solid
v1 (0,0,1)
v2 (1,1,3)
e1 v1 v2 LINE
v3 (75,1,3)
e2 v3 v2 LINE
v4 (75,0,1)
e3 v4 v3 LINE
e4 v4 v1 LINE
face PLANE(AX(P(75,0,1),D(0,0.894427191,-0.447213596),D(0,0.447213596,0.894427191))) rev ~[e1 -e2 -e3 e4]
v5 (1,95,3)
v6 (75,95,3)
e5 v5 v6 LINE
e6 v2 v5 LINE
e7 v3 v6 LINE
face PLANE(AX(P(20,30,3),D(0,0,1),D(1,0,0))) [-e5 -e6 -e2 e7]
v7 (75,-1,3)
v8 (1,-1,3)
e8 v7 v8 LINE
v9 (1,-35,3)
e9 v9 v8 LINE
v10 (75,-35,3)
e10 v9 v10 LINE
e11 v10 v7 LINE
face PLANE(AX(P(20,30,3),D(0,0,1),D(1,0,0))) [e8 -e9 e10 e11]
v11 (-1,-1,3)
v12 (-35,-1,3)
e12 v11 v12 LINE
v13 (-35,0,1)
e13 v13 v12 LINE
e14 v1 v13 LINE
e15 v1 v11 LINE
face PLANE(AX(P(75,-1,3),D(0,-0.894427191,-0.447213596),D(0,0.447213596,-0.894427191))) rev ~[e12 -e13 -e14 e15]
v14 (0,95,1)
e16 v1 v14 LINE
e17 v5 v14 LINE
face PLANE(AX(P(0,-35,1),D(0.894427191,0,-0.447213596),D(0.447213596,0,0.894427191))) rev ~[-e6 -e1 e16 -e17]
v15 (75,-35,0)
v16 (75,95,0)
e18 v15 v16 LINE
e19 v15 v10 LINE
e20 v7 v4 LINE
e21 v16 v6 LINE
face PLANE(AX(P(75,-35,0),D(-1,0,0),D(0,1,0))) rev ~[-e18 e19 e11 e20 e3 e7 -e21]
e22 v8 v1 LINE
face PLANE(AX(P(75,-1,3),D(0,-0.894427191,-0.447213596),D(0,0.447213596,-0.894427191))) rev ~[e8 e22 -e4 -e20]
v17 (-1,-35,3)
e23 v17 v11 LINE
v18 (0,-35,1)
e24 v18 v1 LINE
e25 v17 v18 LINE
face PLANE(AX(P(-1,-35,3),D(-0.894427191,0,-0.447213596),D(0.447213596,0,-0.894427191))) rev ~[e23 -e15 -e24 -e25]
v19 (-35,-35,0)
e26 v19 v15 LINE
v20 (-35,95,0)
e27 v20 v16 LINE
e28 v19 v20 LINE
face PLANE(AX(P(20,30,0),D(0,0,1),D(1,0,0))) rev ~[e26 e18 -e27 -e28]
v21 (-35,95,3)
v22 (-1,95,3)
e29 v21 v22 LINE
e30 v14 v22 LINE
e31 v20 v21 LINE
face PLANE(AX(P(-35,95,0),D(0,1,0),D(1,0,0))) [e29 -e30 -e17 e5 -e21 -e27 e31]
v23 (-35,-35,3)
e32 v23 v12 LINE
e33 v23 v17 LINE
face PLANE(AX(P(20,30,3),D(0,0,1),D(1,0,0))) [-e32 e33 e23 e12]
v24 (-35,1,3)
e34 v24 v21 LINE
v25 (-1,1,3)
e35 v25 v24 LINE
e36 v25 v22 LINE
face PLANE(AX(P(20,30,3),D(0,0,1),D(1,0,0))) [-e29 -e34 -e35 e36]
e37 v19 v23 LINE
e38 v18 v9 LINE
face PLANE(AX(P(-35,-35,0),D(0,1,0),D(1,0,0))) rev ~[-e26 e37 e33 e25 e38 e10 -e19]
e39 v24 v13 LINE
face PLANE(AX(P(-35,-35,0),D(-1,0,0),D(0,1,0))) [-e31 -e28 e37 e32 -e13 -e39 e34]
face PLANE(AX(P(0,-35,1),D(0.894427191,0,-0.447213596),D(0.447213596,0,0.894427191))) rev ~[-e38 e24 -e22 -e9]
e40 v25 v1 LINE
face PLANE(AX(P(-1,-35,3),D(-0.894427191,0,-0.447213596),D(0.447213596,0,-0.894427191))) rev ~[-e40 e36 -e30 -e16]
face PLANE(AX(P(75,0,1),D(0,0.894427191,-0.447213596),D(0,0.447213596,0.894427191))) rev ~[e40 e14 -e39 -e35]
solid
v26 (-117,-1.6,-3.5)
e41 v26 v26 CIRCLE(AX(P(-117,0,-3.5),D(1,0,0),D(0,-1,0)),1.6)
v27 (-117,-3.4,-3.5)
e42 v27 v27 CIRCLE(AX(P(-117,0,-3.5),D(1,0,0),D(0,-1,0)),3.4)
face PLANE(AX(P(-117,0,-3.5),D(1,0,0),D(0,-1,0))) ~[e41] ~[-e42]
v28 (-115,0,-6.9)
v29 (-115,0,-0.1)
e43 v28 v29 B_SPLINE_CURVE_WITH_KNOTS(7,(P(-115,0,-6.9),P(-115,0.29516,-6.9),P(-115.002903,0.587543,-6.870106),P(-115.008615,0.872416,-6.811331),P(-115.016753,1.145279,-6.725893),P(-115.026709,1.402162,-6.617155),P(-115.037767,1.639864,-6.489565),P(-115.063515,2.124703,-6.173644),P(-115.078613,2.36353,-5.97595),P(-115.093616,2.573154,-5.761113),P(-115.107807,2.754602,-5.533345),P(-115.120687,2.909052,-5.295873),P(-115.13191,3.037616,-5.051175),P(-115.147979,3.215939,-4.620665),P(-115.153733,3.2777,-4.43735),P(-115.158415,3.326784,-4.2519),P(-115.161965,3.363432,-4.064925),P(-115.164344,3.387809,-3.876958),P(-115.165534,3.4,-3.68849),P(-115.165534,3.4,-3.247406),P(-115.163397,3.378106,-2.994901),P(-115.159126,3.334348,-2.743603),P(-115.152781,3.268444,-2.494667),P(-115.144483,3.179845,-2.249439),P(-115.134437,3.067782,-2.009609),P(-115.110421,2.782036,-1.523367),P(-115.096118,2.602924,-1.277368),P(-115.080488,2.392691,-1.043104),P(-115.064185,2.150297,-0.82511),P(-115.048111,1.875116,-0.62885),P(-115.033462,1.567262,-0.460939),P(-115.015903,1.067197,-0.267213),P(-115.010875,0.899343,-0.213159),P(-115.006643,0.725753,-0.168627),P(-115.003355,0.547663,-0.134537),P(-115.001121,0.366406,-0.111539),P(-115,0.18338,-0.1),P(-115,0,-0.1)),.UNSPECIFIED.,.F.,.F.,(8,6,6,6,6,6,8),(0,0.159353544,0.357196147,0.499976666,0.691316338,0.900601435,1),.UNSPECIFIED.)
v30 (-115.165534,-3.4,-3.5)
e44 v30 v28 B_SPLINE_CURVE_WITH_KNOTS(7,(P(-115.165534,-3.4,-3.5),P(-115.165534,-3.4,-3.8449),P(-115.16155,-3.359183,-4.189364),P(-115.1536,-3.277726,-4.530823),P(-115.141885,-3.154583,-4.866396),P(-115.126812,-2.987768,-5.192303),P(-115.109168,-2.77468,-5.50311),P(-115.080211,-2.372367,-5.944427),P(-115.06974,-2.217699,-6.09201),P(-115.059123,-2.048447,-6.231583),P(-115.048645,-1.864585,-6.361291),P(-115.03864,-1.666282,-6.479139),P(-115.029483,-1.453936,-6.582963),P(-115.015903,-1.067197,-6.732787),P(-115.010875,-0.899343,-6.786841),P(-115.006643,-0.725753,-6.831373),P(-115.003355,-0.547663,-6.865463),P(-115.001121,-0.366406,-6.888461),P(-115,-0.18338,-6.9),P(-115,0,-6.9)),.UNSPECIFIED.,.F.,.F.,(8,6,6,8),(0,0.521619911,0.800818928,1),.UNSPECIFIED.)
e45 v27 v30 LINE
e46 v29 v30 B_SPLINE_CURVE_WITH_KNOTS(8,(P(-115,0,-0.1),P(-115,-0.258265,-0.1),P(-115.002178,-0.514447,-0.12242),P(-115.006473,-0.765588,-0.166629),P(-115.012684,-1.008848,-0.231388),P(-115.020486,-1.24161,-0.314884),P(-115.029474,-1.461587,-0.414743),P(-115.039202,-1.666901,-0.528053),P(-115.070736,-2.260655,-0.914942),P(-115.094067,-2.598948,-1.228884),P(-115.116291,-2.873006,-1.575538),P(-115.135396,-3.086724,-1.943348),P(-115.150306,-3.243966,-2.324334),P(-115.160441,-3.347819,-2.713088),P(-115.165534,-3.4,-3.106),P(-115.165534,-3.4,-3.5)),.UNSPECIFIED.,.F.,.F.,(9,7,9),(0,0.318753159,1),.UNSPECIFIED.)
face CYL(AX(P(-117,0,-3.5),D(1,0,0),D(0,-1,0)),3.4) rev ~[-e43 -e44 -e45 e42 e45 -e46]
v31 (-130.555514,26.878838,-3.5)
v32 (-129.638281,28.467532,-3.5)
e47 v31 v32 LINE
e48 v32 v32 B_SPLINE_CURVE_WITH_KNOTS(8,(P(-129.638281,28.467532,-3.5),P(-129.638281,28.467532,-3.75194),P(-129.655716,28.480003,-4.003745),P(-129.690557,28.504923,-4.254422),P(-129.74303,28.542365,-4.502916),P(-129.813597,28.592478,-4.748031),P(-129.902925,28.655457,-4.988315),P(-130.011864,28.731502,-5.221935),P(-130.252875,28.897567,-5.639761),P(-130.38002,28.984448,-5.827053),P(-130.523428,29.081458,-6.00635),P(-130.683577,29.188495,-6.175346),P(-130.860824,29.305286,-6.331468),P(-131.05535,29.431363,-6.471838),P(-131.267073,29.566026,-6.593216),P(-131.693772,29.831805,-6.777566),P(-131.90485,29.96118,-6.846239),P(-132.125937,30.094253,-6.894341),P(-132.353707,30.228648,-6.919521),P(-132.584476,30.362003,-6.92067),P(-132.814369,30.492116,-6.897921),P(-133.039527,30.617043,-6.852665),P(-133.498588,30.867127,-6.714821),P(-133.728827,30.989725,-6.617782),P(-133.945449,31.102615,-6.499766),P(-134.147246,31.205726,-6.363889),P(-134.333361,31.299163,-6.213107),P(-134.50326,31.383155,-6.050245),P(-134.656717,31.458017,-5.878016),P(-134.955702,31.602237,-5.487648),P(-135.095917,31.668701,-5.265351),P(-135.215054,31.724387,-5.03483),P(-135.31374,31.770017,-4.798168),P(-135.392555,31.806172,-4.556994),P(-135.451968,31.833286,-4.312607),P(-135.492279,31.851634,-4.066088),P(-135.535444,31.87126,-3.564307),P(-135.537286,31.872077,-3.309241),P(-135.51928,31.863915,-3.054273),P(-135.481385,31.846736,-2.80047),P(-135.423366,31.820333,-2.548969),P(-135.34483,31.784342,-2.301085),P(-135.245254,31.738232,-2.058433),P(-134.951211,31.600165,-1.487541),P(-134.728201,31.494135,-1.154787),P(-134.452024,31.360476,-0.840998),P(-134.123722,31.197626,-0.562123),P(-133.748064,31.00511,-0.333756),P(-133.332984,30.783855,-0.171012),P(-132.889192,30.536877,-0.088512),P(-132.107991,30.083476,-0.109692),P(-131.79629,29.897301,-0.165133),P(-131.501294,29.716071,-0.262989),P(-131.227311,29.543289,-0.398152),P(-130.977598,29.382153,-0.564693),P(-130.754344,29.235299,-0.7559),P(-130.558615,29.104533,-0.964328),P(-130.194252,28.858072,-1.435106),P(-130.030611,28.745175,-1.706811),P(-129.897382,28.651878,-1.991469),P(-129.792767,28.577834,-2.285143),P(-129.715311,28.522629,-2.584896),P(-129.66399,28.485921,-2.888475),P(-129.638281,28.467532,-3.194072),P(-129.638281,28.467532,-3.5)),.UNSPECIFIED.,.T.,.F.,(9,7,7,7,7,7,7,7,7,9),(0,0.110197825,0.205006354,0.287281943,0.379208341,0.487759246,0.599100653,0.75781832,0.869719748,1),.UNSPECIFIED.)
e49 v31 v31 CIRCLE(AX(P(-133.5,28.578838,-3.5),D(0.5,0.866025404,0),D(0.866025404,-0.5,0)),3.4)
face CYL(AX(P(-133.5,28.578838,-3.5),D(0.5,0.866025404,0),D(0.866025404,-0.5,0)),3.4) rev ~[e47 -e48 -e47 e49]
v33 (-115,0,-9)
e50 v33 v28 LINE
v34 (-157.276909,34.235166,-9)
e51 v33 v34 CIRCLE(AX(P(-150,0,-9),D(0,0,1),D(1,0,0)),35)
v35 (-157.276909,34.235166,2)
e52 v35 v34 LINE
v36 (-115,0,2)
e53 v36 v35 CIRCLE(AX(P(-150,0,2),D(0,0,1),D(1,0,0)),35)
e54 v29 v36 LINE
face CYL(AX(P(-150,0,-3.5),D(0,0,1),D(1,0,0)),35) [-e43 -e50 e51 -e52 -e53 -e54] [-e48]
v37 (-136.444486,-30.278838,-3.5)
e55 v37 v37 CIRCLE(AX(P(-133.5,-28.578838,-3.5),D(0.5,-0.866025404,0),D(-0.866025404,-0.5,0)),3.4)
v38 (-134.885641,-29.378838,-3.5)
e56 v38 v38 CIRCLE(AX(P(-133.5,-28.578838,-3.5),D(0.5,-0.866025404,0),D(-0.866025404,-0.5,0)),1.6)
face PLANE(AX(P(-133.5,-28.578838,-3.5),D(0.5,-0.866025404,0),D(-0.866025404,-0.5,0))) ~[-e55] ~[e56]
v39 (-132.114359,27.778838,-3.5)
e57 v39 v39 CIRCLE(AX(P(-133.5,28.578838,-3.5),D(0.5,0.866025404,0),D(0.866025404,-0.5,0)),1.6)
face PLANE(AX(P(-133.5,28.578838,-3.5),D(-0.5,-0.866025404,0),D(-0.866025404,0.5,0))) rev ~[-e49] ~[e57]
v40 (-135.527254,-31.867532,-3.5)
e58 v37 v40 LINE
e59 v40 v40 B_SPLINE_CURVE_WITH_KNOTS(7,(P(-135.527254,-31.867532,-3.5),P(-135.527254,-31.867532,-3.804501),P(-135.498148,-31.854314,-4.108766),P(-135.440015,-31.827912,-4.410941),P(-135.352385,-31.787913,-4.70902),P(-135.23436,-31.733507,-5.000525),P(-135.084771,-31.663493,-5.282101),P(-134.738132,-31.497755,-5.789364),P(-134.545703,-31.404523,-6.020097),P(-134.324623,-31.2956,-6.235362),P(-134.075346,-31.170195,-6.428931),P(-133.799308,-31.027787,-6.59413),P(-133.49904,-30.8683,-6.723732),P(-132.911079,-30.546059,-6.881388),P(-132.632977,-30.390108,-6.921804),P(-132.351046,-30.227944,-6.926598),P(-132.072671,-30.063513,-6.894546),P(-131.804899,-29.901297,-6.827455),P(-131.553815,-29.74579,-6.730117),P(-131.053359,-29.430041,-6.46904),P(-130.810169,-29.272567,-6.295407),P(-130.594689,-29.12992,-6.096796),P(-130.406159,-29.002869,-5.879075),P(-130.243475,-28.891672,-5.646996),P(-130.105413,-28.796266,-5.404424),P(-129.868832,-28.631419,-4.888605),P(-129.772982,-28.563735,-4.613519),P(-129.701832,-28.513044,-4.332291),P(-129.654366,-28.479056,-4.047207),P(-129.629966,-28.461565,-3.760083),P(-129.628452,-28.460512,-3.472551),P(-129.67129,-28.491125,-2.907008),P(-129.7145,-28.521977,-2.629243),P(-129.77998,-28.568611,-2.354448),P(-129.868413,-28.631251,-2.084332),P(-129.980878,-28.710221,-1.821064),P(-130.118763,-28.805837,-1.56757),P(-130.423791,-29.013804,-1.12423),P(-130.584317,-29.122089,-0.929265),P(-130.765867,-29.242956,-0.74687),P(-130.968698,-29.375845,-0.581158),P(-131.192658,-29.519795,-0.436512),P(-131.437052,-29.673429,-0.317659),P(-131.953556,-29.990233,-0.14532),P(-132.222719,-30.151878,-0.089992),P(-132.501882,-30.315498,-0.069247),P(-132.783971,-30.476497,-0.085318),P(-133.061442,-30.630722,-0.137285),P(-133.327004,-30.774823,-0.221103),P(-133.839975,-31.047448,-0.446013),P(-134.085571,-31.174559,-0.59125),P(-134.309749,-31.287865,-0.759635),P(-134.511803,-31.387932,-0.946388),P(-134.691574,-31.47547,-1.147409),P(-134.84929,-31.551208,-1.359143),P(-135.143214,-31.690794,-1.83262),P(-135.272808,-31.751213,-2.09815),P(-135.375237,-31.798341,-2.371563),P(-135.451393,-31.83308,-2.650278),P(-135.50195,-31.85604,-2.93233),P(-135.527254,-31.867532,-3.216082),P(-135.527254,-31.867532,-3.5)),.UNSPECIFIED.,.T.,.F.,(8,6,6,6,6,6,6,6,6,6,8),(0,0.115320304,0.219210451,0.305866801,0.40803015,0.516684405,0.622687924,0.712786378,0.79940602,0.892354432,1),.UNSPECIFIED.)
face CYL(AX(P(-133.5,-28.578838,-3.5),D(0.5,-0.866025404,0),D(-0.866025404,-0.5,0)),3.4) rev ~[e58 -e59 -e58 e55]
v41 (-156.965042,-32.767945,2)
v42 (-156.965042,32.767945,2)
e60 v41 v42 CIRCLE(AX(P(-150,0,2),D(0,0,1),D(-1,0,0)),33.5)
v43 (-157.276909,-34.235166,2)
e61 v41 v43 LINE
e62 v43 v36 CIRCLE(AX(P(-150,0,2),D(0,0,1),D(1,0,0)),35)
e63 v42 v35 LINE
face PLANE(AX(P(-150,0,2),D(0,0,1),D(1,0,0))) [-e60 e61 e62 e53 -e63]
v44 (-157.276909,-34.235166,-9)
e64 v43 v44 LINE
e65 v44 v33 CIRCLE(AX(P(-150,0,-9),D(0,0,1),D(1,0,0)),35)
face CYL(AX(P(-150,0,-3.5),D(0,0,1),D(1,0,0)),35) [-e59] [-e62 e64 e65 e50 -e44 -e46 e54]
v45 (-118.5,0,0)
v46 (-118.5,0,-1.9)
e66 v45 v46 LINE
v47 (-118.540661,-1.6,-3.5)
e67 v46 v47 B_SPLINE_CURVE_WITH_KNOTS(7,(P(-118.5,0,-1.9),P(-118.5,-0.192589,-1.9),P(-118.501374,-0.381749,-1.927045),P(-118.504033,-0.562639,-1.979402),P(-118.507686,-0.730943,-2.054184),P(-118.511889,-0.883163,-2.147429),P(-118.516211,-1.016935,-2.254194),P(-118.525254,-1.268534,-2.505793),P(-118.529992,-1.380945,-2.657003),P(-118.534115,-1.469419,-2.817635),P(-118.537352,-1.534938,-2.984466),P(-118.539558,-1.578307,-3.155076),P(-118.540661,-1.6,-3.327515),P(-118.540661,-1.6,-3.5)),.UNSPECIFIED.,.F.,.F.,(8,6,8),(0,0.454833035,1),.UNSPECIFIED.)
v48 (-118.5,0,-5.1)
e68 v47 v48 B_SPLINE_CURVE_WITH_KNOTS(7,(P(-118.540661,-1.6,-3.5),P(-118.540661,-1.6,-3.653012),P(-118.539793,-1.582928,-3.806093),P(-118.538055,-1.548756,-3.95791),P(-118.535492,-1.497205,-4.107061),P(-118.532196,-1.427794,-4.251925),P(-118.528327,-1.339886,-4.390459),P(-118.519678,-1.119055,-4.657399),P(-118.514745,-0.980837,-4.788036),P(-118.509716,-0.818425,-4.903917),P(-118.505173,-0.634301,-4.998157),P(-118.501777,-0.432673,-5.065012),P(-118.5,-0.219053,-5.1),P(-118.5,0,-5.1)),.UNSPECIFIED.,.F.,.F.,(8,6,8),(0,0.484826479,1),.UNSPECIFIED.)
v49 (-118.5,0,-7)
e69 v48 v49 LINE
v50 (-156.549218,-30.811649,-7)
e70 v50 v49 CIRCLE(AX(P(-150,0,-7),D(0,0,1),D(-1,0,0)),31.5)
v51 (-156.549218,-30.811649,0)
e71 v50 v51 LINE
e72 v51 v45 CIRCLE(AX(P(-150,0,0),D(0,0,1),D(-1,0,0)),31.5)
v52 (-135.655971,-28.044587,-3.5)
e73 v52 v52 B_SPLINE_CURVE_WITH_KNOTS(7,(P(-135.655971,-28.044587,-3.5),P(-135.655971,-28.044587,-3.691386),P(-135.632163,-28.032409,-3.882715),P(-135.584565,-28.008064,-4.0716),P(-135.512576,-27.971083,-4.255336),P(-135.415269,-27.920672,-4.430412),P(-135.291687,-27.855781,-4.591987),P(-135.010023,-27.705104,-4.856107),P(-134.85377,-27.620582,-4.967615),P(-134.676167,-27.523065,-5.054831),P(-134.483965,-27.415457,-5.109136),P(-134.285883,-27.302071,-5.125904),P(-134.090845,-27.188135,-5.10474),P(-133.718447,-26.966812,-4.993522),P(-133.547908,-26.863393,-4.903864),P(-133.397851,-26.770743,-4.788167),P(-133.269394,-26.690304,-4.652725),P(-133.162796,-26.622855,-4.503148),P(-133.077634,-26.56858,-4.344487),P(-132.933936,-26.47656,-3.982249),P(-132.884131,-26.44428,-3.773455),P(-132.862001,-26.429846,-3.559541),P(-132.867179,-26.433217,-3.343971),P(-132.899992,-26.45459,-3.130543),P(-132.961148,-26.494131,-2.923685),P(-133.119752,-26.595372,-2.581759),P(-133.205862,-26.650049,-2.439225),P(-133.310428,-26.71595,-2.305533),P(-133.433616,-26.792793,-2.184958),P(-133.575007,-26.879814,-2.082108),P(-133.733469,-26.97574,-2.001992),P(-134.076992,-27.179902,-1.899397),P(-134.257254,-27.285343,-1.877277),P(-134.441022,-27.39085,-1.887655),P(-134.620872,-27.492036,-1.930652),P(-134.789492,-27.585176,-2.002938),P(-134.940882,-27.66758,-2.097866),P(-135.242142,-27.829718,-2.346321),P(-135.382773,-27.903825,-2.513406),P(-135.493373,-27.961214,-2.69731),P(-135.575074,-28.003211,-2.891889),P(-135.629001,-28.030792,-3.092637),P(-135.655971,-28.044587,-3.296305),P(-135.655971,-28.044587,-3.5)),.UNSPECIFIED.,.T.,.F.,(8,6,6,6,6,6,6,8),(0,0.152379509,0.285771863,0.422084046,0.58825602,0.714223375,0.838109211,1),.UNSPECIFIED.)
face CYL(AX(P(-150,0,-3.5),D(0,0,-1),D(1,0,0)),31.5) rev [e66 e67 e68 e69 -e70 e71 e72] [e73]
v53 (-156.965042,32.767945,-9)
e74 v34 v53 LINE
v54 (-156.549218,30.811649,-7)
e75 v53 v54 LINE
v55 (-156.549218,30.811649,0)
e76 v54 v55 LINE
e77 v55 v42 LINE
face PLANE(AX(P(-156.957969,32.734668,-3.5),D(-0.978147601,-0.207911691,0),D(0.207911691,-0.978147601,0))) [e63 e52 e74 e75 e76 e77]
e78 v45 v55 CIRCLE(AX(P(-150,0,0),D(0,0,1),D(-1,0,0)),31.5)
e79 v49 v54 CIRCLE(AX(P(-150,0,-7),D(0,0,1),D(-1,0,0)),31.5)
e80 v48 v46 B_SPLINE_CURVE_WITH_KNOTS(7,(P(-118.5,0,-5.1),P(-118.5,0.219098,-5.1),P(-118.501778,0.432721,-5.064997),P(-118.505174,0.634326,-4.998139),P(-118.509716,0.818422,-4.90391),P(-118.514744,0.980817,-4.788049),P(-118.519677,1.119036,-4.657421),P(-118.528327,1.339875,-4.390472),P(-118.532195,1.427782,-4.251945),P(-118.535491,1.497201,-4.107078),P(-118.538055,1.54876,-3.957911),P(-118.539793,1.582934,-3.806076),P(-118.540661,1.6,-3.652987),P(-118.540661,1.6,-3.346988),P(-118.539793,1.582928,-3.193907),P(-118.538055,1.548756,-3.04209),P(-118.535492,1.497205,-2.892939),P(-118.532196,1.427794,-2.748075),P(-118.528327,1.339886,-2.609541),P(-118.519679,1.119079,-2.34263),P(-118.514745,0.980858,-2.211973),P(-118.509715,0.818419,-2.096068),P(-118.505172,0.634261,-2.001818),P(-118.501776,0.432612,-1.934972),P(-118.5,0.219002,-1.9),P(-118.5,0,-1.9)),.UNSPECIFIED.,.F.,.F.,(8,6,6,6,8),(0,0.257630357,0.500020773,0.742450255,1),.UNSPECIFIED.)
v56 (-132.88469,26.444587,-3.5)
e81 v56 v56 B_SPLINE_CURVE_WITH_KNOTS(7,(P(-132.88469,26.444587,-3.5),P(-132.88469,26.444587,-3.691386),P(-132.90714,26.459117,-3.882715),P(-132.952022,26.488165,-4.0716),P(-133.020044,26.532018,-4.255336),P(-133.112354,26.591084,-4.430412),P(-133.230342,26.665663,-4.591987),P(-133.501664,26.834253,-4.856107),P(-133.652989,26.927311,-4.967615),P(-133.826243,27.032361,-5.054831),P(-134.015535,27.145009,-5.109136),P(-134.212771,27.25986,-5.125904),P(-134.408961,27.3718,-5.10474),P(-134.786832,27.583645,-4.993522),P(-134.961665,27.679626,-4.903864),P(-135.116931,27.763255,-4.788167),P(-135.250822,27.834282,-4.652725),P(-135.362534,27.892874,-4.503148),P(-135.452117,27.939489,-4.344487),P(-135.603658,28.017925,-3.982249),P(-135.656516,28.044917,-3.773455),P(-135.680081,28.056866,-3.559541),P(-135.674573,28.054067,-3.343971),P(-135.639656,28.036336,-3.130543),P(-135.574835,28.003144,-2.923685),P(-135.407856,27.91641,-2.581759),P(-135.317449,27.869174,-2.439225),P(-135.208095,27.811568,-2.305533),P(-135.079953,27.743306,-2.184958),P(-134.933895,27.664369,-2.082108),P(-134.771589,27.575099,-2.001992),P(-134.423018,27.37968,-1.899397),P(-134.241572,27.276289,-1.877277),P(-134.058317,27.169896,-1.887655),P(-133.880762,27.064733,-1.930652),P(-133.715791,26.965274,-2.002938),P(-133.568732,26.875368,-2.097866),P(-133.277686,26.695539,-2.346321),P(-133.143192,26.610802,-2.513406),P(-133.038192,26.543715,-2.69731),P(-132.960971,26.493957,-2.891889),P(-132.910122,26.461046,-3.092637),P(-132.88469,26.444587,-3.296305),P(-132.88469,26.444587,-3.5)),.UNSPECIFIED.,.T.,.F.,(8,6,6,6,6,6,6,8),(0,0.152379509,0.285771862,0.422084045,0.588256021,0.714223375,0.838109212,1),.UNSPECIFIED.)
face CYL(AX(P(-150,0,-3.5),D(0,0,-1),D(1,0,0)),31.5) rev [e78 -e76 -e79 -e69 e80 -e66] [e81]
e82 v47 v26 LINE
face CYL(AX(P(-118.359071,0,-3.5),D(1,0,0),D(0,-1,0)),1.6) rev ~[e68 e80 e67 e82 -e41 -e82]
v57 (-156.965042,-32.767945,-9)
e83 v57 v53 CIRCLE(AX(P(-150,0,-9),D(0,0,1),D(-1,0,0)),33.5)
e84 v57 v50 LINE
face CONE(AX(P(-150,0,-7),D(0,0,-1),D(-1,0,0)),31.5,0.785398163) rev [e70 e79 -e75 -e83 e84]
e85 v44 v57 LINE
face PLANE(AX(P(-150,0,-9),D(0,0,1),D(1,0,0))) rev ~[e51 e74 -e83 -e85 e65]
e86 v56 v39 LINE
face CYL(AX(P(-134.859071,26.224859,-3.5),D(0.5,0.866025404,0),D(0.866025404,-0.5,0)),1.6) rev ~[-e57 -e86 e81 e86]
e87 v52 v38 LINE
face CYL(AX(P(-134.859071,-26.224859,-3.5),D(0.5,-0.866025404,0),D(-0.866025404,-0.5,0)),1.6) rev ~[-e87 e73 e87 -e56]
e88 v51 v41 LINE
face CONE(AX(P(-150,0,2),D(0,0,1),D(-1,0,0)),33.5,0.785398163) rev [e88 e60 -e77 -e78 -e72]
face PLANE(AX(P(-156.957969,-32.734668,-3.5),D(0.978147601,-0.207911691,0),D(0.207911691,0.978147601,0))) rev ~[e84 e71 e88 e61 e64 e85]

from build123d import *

# Parameters (mm, degrees)
F0_W           = 110
F0_H           = 130
F0_W_2         = 80
F0_H_2         = 100
F1_DEPTH       = 3
F3_DEPTH       = 140
F5_DEPTH       = 120
F7_R           = 35
F7_R_2         = 31.5
F8_DEPTH       = 5.5
F9_W           = 2.7181416105
F9_H           = 1.6
F15_ANGLE_BACK = 78
F15_ANGLE      = 156


# Not quite as in the source:
# - a feature names something its author has since deleted; it is built from what else it names


with BuildPart() as f1:
    # F0 (on Top) → F1 (new body)
    with BuildSketch(Plane.XY):
        with Locations((20, 30)):
            Rectangle(F0_W, F0_H)
        with Locations((20, 30)):
            Rectangle(F0_W_2, F0_H_2, mode=Mode.SUBTRACT)
        with Locations((20, 30)):
            Rectangle(F0_W_2, F0_H_2)
    extrude(amount=F1_DEPTH)

    # F2 (on face) → F3 (cut)
    with BuildSketch(Plane.XZ.offset(35)):
        Polygon((1, 3), (-1, 3), (0, 1), align=None)
    extrude(amount=-F3_DEPTH, mode=Mode.SUBTRACT)

    # F4 (on face) → F5 (cut)
    with BuildSketch(Plane.YZ.offset(75)):
        Polygon((1, 3), (-1, 3), (0, 1), align=None)
    extrude(amount=-F5_DEPTH, mode=Mode.SUBTRACT)


with BuildPart() as f8:
    # F7 (on offset) → F8 (new body, symmetric)
    with BuildSketch(Plane.XY.offset(-3.5)):
        with Locations((-150, 0)):
            Circle(F7_R)
        with Locations((-150, 0)):
            Circle(F7_R_2, mode=Mode.SUBTRACT)
    extrude(amount=F8_DEPTH, both=True)

    # F9 (on offset) → F10 (revolve, cut)
    with BuildSketch(Plane.XY.offset(-3.5)):
        Polygon((-132.0531194037, -31.0849090301), (-133.5, -28.5788383249), (-134.8856406461, -29.3788383249), (-136.4444863729, -30.2788383249), (-134.9976057766, -32.7849090301), align=None)
        Polygon((-134.8856406461, -29.3788383249), (-133.5, -28.5788383249), (-134.8590708053, -26.2248586391), (-136.2447114513, -27.0248586391), align=None)
    revolve(axis=Axis((-118.5595137524, -54.4565195956, -3.5), (0.5, -0.8660254038, 0)), mode=Mode.SUBTRACT)

    # F9 (on offset) → F11 (revolve, cut)
    with BuildSketch(Plane.XY.offset(-3.5)):
        Polygon((-114.1062388075, 0), (-117, 0), (-117, -1.6), (-117, -3.4), (-114.1062388075, -3.4), align=None)
        with Locations((-118.3590708053, -0.8)):
            Rectangle(F9_W, F9_H)
    revolve(axis=Axis((-87.1190275047, 0, -3.5), (1, 0, 0)), mode=Mode.SUBTRACT)

    # F9 (on offset) → F12 (revolve, cut)
    with BuildSketch(Plane.XY.offset(-3.5)):
        Polygon((-132.0531194037, 31.0849090301), (-133.5, 28.5788383249), (-132.1143593539, 27.7788383249), (-130.5555136271, 26.8788383249), (-129.1086330309, 29.3849090301), align=None)
        Polygon((-132.1143593539, 27.7788383249), (-133.5, 28.5788383249), (-134.8590708053, 26.2248586391), (-133.4734301592, 25.4248586391), align=None)
    revolve(axis=Axis((-118.5595137524, 54.4565195956, -3.5), (0.5, 0.8660254038, 0)), mode=Mode.SUBTRACT)

    # F9 (on offset) → F13 (revolve, cut)
    with BuildSketch(Plane.XY.offset(-3.5)):
        Polygon((-167.9468805963, -31.0849090301), (-166.5, -28.5788383249), (-167.8856406461, -27.7788383249), (-169.4444863729, -26.8788383249), (-170.8913669691, -29.3849090301), align=None)
        Polygon((-167.8856406461, -27.7788383249), (-166.5, -28.5788383249), (-165.1409291947, -26.2248586391), (-166.5265698408, -25.4248586391), align=None)
    revolve(axis=Axis((-181.4404862476, -54.4565195956, -3.5), (-0.5, -0.8660254038, 0)), mode=Mode.SUBTRACT)

    # F14 (on Front) → F15 (revolve, cut)
    with BuildSketch(Plane.XZ, mode=Mode.PRIVATE) as f15_sk:
        Polygon((-185, 0), (-185, -7), (-185, -9), (-183.5, -9), (-181.5, -7), (-181.5, 0), (-183.5, 2), (-185, 2), align=None)
    revolve(f15_sk.sketch.rotate(Axis((-150, 0, -3.5), (0, 0, 1)), -F15_ANGLE_BACK), axis=Axis((-150, 0, -3.5), (0, 0, 1)), revolution_arc=F15_ANGLE, mode=Mode.SUBTRACT)

    # F14 (on Front) → F16 (revolve, cut)
    with BuildSketch(Plane.XZ):
        Polygon((-181.5, 2), (-183.5, 2), (-181.5, 0), align=None)
        Polygon((-181.5, -7), (-183.5, -9), (-181.5, -9), align=None)
    revolve(axis=Axis((-150, 0, -3.5), (0, 0, 1)), mode=Mode.SUBTRACT)


solid = Compound([f1.part, f8.part])
